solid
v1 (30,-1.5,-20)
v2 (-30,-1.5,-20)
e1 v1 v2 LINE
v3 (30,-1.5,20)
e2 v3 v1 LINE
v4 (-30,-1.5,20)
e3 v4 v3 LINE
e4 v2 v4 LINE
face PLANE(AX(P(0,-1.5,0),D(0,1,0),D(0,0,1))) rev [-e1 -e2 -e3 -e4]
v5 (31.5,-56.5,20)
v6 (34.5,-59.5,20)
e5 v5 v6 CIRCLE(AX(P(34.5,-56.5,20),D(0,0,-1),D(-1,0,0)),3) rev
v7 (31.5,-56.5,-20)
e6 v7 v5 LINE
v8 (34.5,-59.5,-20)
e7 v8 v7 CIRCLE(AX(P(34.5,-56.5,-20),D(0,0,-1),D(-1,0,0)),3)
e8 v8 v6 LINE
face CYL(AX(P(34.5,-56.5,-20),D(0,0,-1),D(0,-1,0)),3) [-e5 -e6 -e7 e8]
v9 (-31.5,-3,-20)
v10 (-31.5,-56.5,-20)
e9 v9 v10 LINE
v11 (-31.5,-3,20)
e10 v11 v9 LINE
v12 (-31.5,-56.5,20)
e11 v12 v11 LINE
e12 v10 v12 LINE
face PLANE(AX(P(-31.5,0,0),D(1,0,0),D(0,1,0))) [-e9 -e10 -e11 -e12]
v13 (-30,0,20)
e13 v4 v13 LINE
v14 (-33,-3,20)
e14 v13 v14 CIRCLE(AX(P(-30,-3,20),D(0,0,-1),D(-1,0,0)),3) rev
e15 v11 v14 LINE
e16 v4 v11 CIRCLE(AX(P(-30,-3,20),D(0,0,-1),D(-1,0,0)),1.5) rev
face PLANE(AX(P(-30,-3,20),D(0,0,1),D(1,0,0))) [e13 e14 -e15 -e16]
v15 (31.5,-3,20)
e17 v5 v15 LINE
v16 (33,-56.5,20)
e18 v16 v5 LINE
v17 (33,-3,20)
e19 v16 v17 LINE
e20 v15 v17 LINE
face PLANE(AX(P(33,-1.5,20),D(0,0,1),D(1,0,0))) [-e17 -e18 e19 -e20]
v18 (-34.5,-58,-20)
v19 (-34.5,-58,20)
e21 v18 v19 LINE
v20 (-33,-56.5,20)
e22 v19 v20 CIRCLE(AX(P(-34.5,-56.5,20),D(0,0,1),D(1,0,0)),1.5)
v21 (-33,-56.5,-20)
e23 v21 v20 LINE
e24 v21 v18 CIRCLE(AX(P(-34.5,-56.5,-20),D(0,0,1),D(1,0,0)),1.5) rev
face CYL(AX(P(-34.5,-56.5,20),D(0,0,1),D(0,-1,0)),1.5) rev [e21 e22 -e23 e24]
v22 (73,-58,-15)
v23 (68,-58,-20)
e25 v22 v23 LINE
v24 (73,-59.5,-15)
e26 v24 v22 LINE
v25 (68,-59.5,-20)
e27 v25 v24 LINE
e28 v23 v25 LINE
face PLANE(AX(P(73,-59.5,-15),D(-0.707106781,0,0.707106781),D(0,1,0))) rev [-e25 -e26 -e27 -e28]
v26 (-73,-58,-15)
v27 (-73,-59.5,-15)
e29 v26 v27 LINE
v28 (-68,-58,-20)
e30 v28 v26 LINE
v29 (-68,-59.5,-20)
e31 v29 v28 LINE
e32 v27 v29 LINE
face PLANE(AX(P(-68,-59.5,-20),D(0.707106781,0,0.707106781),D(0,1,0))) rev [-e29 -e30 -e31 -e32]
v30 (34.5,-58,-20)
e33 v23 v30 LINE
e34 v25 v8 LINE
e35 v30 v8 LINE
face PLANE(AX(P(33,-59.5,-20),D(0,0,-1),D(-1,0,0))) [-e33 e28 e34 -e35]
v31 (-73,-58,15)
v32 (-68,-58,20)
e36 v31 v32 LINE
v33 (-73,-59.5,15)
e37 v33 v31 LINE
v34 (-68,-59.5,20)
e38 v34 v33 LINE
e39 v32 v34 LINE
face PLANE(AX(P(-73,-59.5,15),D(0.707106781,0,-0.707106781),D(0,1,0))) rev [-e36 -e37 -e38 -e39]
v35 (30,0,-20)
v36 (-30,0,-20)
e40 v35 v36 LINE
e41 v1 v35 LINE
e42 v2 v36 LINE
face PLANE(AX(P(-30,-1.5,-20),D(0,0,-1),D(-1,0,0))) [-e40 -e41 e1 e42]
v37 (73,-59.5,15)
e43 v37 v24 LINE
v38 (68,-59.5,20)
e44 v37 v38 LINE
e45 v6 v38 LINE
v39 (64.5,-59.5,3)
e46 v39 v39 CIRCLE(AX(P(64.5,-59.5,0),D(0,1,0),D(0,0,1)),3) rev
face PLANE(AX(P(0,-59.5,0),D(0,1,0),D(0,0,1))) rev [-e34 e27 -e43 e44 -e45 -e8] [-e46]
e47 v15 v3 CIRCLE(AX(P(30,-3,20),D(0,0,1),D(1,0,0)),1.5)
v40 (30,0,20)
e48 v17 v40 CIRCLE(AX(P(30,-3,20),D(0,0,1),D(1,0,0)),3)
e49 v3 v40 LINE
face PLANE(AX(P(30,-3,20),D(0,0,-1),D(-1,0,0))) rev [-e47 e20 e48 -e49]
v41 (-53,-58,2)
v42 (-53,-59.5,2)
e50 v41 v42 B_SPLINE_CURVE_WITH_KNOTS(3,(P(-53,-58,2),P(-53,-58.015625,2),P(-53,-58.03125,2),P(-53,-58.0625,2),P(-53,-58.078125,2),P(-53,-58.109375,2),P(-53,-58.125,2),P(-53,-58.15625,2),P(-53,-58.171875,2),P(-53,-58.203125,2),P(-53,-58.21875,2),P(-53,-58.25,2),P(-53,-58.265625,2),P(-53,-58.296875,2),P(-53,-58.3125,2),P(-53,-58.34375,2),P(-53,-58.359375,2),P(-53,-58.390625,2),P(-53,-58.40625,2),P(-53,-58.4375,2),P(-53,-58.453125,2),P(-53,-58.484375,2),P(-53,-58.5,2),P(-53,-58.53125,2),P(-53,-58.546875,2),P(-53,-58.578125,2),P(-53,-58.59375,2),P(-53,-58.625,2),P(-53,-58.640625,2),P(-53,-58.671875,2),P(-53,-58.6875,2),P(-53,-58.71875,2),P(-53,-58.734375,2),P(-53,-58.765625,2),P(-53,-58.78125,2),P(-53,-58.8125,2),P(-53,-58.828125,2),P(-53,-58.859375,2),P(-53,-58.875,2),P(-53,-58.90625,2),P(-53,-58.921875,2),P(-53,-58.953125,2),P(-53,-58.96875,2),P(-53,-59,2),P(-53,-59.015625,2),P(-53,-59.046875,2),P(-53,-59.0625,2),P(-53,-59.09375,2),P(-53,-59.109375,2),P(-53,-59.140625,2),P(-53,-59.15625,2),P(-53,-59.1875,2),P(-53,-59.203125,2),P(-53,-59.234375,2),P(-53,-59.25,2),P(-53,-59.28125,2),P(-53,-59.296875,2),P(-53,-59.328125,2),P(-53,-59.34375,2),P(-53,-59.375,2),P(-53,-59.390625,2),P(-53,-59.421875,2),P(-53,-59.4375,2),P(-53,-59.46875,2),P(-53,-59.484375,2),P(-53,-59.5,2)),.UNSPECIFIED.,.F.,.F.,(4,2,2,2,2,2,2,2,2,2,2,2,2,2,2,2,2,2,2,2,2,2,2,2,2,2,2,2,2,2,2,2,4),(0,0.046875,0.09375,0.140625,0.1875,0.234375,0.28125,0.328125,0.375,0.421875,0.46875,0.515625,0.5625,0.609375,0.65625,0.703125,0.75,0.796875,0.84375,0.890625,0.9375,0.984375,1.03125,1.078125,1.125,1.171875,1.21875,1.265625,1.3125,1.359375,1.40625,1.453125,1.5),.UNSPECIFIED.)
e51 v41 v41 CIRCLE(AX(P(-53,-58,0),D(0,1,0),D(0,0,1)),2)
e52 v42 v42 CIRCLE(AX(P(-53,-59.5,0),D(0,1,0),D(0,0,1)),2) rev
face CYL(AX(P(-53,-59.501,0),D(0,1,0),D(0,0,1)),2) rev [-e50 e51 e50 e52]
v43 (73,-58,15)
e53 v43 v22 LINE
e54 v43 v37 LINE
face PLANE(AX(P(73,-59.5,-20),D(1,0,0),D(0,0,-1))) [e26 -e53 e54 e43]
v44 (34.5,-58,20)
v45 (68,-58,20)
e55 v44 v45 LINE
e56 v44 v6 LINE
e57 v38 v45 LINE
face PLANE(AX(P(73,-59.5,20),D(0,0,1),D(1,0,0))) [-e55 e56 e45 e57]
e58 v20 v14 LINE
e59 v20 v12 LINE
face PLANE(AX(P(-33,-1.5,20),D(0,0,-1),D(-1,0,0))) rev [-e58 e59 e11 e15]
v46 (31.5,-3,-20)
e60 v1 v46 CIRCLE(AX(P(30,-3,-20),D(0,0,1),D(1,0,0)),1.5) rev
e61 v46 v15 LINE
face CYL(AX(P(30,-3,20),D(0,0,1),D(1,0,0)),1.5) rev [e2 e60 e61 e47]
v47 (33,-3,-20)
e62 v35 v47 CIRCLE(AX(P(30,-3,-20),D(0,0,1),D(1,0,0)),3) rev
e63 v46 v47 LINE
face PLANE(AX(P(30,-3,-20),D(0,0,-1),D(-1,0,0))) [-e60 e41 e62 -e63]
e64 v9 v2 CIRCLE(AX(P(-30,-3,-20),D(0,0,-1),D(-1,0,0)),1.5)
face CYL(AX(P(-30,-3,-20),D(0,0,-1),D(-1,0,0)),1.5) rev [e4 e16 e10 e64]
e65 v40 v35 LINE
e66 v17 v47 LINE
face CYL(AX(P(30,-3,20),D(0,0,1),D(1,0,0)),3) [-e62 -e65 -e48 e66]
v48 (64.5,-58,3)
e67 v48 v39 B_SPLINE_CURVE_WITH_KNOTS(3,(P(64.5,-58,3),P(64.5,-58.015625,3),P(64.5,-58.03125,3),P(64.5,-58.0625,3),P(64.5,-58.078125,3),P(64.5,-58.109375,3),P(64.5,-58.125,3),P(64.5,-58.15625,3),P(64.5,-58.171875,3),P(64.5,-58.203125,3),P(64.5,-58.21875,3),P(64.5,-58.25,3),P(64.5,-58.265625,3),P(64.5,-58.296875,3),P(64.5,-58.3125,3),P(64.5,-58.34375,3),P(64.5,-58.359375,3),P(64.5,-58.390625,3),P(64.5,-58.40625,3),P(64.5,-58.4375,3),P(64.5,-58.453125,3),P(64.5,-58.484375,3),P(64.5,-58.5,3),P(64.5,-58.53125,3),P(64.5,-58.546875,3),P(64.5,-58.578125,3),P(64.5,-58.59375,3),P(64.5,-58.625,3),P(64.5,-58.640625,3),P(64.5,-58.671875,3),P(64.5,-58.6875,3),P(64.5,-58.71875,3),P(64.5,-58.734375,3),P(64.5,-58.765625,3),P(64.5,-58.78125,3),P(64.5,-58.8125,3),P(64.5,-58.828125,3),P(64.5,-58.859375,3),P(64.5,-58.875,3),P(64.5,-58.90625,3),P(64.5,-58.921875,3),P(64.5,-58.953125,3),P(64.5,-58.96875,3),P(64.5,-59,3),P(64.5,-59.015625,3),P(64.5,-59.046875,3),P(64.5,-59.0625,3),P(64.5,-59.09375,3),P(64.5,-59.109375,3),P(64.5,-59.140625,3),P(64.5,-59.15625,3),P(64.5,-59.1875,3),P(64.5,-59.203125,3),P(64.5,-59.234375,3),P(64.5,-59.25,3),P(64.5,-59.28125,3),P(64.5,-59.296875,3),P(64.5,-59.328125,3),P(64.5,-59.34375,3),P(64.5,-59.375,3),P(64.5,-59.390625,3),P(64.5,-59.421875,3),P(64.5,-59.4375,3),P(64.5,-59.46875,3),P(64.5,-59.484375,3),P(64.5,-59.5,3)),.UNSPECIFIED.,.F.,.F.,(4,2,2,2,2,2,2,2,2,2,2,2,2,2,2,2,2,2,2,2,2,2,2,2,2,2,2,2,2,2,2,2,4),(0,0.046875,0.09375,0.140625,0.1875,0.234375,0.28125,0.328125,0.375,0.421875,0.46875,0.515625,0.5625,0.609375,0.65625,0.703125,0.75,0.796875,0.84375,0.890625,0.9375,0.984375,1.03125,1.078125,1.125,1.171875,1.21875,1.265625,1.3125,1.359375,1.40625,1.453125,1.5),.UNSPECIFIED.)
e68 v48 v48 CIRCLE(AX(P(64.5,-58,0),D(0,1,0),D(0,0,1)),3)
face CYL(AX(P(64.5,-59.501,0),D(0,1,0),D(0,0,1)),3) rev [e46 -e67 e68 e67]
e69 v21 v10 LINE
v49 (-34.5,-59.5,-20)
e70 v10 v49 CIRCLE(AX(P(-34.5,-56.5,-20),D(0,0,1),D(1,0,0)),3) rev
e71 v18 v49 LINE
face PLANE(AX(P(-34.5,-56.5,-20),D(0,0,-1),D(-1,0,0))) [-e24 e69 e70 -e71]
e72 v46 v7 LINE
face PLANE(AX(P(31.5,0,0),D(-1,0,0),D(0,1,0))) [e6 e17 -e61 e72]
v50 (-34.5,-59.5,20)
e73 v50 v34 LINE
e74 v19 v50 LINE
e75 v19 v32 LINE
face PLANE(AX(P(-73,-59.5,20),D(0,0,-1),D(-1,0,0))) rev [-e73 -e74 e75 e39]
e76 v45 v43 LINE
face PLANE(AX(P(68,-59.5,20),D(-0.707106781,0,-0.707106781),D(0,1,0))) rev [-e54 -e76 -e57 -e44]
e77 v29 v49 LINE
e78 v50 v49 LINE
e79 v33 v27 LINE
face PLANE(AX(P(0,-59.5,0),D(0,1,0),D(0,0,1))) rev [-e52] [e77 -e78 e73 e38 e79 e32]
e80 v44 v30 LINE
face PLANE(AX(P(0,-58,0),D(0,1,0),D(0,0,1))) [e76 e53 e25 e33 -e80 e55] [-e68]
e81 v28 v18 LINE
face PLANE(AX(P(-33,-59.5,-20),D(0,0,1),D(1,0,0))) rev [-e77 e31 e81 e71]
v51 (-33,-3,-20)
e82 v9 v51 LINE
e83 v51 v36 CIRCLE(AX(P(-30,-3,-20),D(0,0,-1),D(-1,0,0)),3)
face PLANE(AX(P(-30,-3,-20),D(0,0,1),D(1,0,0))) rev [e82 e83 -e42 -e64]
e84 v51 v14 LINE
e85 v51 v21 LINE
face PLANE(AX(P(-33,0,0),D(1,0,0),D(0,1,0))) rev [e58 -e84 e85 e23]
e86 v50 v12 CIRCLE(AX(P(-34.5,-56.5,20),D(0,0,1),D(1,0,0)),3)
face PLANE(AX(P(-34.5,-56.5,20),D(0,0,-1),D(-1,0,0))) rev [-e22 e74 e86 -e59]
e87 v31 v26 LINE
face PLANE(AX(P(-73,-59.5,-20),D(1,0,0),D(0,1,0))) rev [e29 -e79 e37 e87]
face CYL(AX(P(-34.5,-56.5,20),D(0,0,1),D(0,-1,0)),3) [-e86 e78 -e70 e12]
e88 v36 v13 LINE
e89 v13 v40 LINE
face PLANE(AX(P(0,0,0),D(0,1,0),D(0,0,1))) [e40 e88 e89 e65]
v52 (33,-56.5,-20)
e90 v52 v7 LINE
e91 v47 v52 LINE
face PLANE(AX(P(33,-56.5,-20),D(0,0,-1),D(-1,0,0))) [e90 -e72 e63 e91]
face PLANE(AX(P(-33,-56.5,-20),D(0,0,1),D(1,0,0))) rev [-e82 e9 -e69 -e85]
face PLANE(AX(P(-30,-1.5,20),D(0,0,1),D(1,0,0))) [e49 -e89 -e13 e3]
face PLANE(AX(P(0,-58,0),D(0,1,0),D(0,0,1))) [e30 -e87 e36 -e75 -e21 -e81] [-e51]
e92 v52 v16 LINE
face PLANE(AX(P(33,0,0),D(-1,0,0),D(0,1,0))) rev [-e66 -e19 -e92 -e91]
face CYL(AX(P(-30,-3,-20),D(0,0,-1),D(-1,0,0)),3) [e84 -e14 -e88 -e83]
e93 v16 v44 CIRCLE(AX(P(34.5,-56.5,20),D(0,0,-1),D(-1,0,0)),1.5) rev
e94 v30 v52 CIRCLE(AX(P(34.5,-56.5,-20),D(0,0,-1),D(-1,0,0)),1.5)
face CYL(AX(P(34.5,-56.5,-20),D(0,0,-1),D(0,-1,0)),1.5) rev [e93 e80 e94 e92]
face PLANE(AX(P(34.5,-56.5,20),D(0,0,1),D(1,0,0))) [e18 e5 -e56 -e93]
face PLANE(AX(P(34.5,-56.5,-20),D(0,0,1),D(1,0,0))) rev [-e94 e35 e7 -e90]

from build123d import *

# Parameters (mm, degrees)
SKETCH1_W          = 60
SKETCH1_H          = 40
BASE_FLANGE1_DEPTH = 1.5
EDGE_FLANGE1_DEPTH = 40
EDGE_FLANGE2_DEPTH = 40
CHAMFER1_SIZE      = 5
CUT_EXTRUDE1_REACH = 97.357
SKETCH10_R         = 2
SKETCH10_R_2       = 3


# Sheet-metal steps are written as plain solids
with BuildPart() as part:
    # Sketch1 → Base-Flange1 (new body)
    with BuildSketch(Plane(origin=(0, 0, 0), x_dir=(1, 0, 0), z_dir=(0, 1, 0))):
        Rectangle(SKETCH1_W, SKETCH1_H)
    extrude(amount=-BASE_FLANGE1_DEPTH)

    # Edge-Flange1 section (across the edge) → Edge-Flange1 (add)
    with BuildSketch(Plane(origin=(-31.5, -1.5, 20), x_dir=(1, 0, 0), z_dir=(0, 0, -1))):
        with BuildLine():
            Line((-1.5, 1.5), (-1.5, 55))
            Line((-1.5, 55), (0, 55))
            Line((0, 55), (0, 1.5))
            ThreePointArc((0, 1.5), (0.439339828, 0.439339828), (1.5, 0))
            Line((1.5, 0), (1.5, -1.5))
            ThreePointArc((1.5, -1.5), (-0.621320344, -0.621320344), (-1.5, 1.5))
        make_face()
    edge_flange1 = extrude(amount=EDGE_FLANGE1_DEPTH)

    # Edge-Flange2 section (across the edge) → Edge-Flange2 (add)
    with BuildSketch(Plane(origin=(-33, -58, -20), x_dir=(0, 1, 0), z_dir=(0, 0, 1))):
        with BuildLine():
            Line((-1.5, 1.5), (-1.5, 40))
            Line((-1.5, 40), (0, 40))
            Line((0, 40), (0, 1.5))
            ThreePointArc((0, 1.5), (0.439339828, 0.439339828), (1.5, 0))
            Line((1.5, 0), (1.5, -1.5))
            ThreePointArc((1.5, -1.5), (-0.621320344, -0.621320344), (-1.5, 1.5))
        make_face()
    edge_flange2 = extrude(amount=EDGE_FLANGE2_DEPTH)

    # Mirror1: Edge-Flange1, Edge-Flange2 across plane
    add(edge_flange1.mirror(Plane(origin=(0, 0, 0), x_dir=(0, 0, 1), z_dir=(1, 0, 0))))
    add(edge_flange2.mirror(Plane(origin=(0, 0, 0), x_dir=(0, 0, 1), z_dir=(1, 0, 0))))

    # Chamfer1
    chamfer1_edges = [part.edges().sort_by_distance(p)[0] for p in [
        (-73, -58.75, -20),
        (-73, -58.75, 20),
        (73, -58.75, 20),
        (73, -58.75, -20),
    ]]
    chamfer(chamfer1_edges, length=CHAMFER1_SIZE)

    # Sketch10 → Cut-Extrude1 (cut, up to next)
    with BuildSketch(Plane(origin=(0, -58, 0), x_dir=(1, 0, 0), z_dir=(0, 1, 0)), mode=Mode.PRIVATE) as cut_extrude1_sk1:
        with Locations(Location((-53, 0, 0), (0, 0, 270))):
            Circle(SKETCH10_R)
    cut_extrude1_tool1 = extrude(cut_extrude1_sk1.sketch, amount=-CUT_EXTRUDE1_REACH, mode=Mode.PRIVATE) & part.part
    # Sketch10 → Cut-Extrude1 (cut, up to next)
    with BuildSketch(Plane(origin=(0, -58, 0), x_dir=(1, 0, 0), z_dir=(0, 1, 0)), mode=Mode.PRIVATE) as cut_extrude1_sk2:
        with Locations(Location((64.5, 0, 0), (0, 0, 270))):
            Circle(SKETCH10_R_2)
    cut_extrude1_tool2 = extrude(cut_extrude1_sk2.sketch, amount=-CUT_EXTRUDE1_REACH, mode=Mode.PRIVATE) & part.part
    add(cut_extrude1_tool1.solids().sort_by_distance((-53, -58, 0))[0], mode=Mode.SUBTRACT)
    add(cut_extrude1_tool2.solids().sort_by_distance((64.5, -58, 0))[0], mode=Mode.SUBTRACT)


solid = part.part
